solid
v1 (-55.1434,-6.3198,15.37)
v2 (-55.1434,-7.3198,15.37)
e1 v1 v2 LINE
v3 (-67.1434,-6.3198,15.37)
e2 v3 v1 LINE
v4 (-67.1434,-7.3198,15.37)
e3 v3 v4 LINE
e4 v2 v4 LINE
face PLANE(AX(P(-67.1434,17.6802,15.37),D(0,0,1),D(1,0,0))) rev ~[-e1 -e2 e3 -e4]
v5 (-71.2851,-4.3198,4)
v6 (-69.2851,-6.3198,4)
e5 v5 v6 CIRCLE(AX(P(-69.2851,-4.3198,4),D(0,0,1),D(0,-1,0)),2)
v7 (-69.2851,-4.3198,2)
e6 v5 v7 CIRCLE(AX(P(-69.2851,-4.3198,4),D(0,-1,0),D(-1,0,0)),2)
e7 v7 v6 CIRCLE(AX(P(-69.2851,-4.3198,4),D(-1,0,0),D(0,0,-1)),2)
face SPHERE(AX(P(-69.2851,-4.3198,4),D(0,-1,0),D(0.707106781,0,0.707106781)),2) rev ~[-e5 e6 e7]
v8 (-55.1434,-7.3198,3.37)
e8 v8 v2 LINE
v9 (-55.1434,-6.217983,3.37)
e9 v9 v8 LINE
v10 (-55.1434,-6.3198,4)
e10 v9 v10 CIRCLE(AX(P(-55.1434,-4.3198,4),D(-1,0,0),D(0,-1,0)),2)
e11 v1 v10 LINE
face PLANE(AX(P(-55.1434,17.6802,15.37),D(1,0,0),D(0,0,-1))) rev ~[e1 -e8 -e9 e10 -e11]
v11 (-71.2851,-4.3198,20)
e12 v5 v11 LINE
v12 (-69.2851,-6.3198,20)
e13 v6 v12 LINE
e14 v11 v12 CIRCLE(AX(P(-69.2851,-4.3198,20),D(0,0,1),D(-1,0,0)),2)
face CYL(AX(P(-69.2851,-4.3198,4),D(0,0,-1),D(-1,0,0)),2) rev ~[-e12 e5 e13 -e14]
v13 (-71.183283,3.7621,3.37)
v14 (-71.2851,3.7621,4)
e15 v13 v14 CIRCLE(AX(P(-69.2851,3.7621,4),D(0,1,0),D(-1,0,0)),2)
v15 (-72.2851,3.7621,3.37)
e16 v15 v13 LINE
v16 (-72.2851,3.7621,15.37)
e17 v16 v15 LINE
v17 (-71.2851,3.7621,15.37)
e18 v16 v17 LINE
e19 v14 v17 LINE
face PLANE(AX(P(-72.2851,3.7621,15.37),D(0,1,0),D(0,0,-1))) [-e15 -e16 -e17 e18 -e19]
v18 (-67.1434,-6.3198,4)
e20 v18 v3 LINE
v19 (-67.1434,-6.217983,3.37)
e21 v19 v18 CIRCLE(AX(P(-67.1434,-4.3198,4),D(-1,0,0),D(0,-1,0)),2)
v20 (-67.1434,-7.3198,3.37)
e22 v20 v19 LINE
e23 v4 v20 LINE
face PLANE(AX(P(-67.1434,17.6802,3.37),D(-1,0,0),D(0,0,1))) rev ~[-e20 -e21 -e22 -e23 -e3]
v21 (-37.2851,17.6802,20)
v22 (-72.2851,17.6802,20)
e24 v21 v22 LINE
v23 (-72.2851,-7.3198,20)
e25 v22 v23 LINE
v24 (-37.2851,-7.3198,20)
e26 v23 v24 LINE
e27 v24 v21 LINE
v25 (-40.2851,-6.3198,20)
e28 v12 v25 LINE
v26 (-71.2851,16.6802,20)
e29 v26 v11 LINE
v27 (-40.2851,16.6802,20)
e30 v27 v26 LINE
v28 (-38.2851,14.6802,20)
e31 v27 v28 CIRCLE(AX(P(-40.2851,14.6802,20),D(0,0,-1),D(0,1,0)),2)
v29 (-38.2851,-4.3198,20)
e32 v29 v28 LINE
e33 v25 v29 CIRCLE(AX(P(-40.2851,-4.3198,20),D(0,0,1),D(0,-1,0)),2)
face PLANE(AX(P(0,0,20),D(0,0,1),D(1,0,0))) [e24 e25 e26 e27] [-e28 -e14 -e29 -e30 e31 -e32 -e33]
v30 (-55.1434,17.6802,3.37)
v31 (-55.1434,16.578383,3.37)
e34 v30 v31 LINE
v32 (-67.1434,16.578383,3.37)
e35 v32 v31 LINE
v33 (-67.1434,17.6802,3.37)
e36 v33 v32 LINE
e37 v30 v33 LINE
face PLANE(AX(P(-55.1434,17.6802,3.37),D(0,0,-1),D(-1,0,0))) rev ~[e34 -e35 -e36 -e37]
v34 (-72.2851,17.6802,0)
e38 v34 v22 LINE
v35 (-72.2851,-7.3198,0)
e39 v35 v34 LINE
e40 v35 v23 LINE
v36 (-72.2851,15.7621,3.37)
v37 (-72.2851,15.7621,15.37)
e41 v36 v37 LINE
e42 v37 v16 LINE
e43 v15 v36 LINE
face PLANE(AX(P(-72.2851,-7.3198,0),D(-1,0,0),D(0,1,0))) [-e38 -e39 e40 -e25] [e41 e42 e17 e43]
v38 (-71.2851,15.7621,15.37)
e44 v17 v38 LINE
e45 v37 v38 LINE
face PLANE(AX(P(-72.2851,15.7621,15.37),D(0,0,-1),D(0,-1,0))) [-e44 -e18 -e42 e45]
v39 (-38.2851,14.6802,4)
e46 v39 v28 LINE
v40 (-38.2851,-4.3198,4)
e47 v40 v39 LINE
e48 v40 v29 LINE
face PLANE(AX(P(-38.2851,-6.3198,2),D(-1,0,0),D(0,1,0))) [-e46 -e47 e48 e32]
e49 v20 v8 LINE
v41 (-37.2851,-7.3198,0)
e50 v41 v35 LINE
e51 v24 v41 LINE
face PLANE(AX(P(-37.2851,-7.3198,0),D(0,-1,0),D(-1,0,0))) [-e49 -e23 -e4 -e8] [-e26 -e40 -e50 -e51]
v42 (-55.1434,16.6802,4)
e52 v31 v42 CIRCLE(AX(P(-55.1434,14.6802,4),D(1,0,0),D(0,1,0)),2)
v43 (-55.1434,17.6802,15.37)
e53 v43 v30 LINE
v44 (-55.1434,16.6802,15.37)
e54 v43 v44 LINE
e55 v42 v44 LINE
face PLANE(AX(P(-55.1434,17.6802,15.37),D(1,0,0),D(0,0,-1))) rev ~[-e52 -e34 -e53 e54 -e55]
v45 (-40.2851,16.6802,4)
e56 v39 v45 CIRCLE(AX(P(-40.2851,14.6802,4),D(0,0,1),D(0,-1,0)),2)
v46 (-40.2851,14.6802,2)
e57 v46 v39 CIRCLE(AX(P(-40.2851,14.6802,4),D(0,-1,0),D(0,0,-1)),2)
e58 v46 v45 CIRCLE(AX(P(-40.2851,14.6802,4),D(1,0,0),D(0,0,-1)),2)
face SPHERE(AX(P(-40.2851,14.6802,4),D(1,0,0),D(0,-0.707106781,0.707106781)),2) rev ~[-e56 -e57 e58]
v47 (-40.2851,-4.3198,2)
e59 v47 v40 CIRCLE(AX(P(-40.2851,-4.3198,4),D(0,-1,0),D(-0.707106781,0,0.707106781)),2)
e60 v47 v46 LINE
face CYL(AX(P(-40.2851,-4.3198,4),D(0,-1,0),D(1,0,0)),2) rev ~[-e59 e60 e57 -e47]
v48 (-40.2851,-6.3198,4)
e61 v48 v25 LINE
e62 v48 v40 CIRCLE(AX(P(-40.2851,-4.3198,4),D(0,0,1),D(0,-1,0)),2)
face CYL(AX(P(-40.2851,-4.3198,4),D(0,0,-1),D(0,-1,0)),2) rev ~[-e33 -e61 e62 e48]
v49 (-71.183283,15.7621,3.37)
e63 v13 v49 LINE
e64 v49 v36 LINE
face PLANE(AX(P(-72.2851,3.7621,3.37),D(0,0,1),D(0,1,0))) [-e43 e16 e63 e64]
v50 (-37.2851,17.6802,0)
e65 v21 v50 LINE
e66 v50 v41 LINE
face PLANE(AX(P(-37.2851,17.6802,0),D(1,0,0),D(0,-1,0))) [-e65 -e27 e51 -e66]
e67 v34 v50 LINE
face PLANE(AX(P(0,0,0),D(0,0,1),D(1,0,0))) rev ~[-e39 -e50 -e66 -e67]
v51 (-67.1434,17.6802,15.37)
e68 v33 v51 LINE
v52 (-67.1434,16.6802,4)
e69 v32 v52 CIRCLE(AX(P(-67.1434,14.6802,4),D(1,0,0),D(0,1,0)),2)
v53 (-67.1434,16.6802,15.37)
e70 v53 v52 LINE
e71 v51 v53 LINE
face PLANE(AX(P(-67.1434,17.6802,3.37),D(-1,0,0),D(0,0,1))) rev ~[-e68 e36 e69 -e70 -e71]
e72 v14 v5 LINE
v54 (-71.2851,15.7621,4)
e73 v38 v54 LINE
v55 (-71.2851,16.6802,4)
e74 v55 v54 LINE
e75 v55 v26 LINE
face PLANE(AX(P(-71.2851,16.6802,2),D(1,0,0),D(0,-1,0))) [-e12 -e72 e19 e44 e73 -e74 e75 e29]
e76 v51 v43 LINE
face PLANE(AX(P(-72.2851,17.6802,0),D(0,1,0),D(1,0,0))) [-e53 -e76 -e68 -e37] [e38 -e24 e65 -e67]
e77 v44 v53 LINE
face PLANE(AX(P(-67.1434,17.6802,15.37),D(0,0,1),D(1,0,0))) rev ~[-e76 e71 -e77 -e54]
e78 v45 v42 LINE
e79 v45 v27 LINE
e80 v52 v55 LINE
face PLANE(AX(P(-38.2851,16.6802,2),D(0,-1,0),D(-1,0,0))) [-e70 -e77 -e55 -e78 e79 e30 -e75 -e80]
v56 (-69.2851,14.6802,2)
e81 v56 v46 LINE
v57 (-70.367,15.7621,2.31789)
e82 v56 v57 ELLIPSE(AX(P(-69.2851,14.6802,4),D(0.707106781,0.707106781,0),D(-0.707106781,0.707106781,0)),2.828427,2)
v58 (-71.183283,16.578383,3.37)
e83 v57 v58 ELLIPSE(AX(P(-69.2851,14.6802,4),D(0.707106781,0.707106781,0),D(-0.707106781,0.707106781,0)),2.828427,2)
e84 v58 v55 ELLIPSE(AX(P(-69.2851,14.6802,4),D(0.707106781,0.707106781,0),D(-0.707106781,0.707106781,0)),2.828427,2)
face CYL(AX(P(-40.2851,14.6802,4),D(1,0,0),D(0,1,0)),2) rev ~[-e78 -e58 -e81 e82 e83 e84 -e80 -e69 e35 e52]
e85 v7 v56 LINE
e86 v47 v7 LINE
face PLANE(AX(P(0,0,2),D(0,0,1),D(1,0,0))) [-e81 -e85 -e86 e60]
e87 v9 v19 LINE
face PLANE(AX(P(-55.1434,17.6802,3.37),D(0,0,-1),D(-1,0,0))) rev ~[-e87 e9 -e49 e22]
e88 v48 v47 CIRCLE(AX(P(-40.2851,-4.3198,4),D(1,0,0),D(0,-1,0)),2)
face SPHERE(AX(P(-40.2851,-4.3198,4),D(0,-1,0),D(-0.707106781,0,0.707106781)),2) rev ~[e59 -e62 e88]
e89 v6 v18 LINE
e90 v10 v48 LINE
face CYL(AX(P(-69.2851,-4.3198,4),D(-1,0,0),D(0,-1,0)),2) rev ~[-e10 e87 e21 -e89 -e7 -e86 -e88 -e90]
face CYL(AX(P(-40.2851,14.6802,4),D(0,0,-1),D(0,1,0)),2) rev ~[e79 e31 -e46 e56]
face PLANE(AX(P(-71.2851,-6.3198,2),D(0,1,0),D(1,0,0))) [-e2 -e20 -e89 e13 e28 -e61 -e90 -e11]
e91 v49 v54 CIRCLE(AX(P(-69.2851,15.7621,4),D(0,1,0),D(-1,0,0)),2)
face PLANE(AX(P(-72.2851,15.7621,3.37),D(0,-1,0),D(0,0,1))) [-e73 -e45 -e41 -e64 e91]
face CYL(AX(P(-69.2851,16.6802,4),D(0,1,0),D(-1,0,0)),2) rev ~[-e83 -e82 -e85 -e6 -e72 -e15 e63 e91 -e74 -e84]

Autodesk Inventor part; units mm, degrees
ref_plane "YZ Plane" through (0, 0, 0) normal (1, 0, 0) x (0, 1, 0)
ref_plane "XZ Plane" through (0, 0, 0) normal (0, 1, 0) x (-1, 0, 0)
ref_plane "XY Plane" through (0, 0, 0) normal (0, 0, 1) x (1, 0, 0)
ref_plane "Work Plane1" through (0, 0, 0) normal (0, 0, 1) x (1, 0, 0)
sketch "Sketch1" plane through (0, 0, 0) normal (0, 0, 1) x (1, 0, 0)
  arc A0 (-74.415, -11.0527) -> (-74.415, -5.9883) centre (-76.6839, -8.5205) ccw projected
  line L0 (-74.415, -11.3137) -> (-74.415, -11.0527) projected
  line L1 (30, -11.3137) -> (-74.415, -11.3137) projected
  line L2 (30, 11.3137) -> (30, -11.3137) projected
  line L3 (25, 11.3137) -> (30, 11.3137) projected
  line L4 (0, 11.3137) -> (25, 11.3137) projected
  line L5 (-25, 11.3137) -> (0, 11.3137) projected
  line L6 (-30, 11.3137) -> (-25, 11.3137) projected
  line L7 (-30, 16.3137) -> (-30, 11.3137) projected
  line L8 (-30, 24.6863) -> (-30, 16.3137) projected
  line L9 (-74.415, 24.6863) -> (-30, 24.6863) projected
  line L10 (-74.415, -5.9883) -> (-74.415, 24.6863) projected
  line L11 (-72.2851, 17.6802) -> (-37.2851, 17.6802)
  line L12 (-37.2851, 17.6802) -> (-37.2851, -7.3198)
  line L13 (-37.2851, -7.3198) -> (-72.2851, -7.3198)
  line L14 (-72.2851, -7.3198) -> (-72.2851, 17.6802)
  point P0 (0, 0)
  dimension "d0" = 35
  dimension "d1" = 25
extrude "Extrusion1" add sketch "Sketch1" along normal blind 2 contours L11 L12 L13 L14
sketch "Sketch2" plane through (0, 0, 2) normal (0, 0, 1) x (1, 0, 0)
  line L0 (-37.2851, 17.6802) -> (-72.2851, 17.6802) projected
  line L1 (-72.2851, 17.6802) -> (-72.2851, -7.3198) projected
  line L2 (-72.2851, -7.3198) -> (-37.2851, -7.3198) projected
  line L3 (-37.2851, -7.3198) -> (-37.2851, 17.6802) projected
  line L4 (-38.2851, 16.6802) -> (-71.2851, 16.6802)
  line L5 (-71.2851, 16.6802) -> (-71.2851, -6.3198)
  line L6 (-71.2851, -6.3198) -> (-38.2851, -6.3198)
  line L7 (-38.2851, -6.3198) -> (-38.2851, 16.6802)
  point P0 (0, 0)
  dimension "d4" = 1
extrude "Extrusion2" add sketch "Sketch2" along normal blind 18
sketch "Sketch3" plane through (-72.2851, -7.3198, 0) normal (-1, 0, 0) x (0, 0, 1)
  line L0 (0, 0) -> (0, 25) projected
  line L1 (0, 0) -> (20, 0) projected
  line L2 (20, 25) -> (20, 0) projected
  line L3 (0, 25) -> (20, 25) projected
  line L4 (3.37, 23.0819) -> (15.37, 23.0819)
  line L5 (15.37, 23.0819) -> (15.37, 11.0819)
  line L6 (15.37, 11.0819) -> (3.37, 11.0819)
  line L7 (3.37, 11.0819) -> (3.37, 23.0819)
  line L8 (3.37, 23.0819) -> (15.37, 11.0819) construction
  line L9 (15.37, 23.0819) -> (3.37, 11.0819) construction
  point P0 (0, 7.3198)
  point P1 (9.37, 17.0819)
  dimension "d7" = 12
  dimension "d8" = 12
extrude "Extrusion3" cut sketch "Sketch3" against normal blind 15 contours L4 L5 L6 L7
sketch "Sketch4" plane through (-72.2851, 17.6802, 0) normal (0, 1, 0) x (1, 0, 0)
  line L0 (0, 0) -> (35, 0) projected
  line L1 (0, 0) -> (0, -20) projected
  line L2 (35, -20) -> (0, -20) projected
  line L3 (35, 0) -> (35, -20) projected
  line L4 (17.1417, -3.37) -> (5.1417, -3.37)
  line L5 (5.1417, -3.37) -> (5.1417, -15.37)
  line L6 (5.1417, -15.37) -> (17.1417, -15.37)
  line L7 (17.1417, -15.37) -> (17.1417, -3.37)
  line L8 (17.1417, -3.37) -> (5.1417, -15.37) construction
  line L9 (5.1417, -3.37) -> (17.1417, -15.37) construction
  point P0 (72.2851, 0)
  point P1 (11.1417, -9.37)
  point P2 (0, -3.37)
  dimension "d11" = 12
  dimension "d12" = 12
  dimension "d15" = 0
extrude "Extrusion4" cut sketch "Sketch4" against normal through all contours L7 L6 L5 L4
fillet "Fillet1" radius 2 7 edges at (-71.2851, 5.1802, 2) (-54.7851, 16.6802, 2) (-38.2851, 5.1802, 2) (-54.7851, -6.3198, 2) (-38.2851, -6.3198, 11) (-71.2851, -6.3198, 11) (-38.2851, 16.6802, 11)
properties part number "10_MiniSPIM_Samplechamber"
